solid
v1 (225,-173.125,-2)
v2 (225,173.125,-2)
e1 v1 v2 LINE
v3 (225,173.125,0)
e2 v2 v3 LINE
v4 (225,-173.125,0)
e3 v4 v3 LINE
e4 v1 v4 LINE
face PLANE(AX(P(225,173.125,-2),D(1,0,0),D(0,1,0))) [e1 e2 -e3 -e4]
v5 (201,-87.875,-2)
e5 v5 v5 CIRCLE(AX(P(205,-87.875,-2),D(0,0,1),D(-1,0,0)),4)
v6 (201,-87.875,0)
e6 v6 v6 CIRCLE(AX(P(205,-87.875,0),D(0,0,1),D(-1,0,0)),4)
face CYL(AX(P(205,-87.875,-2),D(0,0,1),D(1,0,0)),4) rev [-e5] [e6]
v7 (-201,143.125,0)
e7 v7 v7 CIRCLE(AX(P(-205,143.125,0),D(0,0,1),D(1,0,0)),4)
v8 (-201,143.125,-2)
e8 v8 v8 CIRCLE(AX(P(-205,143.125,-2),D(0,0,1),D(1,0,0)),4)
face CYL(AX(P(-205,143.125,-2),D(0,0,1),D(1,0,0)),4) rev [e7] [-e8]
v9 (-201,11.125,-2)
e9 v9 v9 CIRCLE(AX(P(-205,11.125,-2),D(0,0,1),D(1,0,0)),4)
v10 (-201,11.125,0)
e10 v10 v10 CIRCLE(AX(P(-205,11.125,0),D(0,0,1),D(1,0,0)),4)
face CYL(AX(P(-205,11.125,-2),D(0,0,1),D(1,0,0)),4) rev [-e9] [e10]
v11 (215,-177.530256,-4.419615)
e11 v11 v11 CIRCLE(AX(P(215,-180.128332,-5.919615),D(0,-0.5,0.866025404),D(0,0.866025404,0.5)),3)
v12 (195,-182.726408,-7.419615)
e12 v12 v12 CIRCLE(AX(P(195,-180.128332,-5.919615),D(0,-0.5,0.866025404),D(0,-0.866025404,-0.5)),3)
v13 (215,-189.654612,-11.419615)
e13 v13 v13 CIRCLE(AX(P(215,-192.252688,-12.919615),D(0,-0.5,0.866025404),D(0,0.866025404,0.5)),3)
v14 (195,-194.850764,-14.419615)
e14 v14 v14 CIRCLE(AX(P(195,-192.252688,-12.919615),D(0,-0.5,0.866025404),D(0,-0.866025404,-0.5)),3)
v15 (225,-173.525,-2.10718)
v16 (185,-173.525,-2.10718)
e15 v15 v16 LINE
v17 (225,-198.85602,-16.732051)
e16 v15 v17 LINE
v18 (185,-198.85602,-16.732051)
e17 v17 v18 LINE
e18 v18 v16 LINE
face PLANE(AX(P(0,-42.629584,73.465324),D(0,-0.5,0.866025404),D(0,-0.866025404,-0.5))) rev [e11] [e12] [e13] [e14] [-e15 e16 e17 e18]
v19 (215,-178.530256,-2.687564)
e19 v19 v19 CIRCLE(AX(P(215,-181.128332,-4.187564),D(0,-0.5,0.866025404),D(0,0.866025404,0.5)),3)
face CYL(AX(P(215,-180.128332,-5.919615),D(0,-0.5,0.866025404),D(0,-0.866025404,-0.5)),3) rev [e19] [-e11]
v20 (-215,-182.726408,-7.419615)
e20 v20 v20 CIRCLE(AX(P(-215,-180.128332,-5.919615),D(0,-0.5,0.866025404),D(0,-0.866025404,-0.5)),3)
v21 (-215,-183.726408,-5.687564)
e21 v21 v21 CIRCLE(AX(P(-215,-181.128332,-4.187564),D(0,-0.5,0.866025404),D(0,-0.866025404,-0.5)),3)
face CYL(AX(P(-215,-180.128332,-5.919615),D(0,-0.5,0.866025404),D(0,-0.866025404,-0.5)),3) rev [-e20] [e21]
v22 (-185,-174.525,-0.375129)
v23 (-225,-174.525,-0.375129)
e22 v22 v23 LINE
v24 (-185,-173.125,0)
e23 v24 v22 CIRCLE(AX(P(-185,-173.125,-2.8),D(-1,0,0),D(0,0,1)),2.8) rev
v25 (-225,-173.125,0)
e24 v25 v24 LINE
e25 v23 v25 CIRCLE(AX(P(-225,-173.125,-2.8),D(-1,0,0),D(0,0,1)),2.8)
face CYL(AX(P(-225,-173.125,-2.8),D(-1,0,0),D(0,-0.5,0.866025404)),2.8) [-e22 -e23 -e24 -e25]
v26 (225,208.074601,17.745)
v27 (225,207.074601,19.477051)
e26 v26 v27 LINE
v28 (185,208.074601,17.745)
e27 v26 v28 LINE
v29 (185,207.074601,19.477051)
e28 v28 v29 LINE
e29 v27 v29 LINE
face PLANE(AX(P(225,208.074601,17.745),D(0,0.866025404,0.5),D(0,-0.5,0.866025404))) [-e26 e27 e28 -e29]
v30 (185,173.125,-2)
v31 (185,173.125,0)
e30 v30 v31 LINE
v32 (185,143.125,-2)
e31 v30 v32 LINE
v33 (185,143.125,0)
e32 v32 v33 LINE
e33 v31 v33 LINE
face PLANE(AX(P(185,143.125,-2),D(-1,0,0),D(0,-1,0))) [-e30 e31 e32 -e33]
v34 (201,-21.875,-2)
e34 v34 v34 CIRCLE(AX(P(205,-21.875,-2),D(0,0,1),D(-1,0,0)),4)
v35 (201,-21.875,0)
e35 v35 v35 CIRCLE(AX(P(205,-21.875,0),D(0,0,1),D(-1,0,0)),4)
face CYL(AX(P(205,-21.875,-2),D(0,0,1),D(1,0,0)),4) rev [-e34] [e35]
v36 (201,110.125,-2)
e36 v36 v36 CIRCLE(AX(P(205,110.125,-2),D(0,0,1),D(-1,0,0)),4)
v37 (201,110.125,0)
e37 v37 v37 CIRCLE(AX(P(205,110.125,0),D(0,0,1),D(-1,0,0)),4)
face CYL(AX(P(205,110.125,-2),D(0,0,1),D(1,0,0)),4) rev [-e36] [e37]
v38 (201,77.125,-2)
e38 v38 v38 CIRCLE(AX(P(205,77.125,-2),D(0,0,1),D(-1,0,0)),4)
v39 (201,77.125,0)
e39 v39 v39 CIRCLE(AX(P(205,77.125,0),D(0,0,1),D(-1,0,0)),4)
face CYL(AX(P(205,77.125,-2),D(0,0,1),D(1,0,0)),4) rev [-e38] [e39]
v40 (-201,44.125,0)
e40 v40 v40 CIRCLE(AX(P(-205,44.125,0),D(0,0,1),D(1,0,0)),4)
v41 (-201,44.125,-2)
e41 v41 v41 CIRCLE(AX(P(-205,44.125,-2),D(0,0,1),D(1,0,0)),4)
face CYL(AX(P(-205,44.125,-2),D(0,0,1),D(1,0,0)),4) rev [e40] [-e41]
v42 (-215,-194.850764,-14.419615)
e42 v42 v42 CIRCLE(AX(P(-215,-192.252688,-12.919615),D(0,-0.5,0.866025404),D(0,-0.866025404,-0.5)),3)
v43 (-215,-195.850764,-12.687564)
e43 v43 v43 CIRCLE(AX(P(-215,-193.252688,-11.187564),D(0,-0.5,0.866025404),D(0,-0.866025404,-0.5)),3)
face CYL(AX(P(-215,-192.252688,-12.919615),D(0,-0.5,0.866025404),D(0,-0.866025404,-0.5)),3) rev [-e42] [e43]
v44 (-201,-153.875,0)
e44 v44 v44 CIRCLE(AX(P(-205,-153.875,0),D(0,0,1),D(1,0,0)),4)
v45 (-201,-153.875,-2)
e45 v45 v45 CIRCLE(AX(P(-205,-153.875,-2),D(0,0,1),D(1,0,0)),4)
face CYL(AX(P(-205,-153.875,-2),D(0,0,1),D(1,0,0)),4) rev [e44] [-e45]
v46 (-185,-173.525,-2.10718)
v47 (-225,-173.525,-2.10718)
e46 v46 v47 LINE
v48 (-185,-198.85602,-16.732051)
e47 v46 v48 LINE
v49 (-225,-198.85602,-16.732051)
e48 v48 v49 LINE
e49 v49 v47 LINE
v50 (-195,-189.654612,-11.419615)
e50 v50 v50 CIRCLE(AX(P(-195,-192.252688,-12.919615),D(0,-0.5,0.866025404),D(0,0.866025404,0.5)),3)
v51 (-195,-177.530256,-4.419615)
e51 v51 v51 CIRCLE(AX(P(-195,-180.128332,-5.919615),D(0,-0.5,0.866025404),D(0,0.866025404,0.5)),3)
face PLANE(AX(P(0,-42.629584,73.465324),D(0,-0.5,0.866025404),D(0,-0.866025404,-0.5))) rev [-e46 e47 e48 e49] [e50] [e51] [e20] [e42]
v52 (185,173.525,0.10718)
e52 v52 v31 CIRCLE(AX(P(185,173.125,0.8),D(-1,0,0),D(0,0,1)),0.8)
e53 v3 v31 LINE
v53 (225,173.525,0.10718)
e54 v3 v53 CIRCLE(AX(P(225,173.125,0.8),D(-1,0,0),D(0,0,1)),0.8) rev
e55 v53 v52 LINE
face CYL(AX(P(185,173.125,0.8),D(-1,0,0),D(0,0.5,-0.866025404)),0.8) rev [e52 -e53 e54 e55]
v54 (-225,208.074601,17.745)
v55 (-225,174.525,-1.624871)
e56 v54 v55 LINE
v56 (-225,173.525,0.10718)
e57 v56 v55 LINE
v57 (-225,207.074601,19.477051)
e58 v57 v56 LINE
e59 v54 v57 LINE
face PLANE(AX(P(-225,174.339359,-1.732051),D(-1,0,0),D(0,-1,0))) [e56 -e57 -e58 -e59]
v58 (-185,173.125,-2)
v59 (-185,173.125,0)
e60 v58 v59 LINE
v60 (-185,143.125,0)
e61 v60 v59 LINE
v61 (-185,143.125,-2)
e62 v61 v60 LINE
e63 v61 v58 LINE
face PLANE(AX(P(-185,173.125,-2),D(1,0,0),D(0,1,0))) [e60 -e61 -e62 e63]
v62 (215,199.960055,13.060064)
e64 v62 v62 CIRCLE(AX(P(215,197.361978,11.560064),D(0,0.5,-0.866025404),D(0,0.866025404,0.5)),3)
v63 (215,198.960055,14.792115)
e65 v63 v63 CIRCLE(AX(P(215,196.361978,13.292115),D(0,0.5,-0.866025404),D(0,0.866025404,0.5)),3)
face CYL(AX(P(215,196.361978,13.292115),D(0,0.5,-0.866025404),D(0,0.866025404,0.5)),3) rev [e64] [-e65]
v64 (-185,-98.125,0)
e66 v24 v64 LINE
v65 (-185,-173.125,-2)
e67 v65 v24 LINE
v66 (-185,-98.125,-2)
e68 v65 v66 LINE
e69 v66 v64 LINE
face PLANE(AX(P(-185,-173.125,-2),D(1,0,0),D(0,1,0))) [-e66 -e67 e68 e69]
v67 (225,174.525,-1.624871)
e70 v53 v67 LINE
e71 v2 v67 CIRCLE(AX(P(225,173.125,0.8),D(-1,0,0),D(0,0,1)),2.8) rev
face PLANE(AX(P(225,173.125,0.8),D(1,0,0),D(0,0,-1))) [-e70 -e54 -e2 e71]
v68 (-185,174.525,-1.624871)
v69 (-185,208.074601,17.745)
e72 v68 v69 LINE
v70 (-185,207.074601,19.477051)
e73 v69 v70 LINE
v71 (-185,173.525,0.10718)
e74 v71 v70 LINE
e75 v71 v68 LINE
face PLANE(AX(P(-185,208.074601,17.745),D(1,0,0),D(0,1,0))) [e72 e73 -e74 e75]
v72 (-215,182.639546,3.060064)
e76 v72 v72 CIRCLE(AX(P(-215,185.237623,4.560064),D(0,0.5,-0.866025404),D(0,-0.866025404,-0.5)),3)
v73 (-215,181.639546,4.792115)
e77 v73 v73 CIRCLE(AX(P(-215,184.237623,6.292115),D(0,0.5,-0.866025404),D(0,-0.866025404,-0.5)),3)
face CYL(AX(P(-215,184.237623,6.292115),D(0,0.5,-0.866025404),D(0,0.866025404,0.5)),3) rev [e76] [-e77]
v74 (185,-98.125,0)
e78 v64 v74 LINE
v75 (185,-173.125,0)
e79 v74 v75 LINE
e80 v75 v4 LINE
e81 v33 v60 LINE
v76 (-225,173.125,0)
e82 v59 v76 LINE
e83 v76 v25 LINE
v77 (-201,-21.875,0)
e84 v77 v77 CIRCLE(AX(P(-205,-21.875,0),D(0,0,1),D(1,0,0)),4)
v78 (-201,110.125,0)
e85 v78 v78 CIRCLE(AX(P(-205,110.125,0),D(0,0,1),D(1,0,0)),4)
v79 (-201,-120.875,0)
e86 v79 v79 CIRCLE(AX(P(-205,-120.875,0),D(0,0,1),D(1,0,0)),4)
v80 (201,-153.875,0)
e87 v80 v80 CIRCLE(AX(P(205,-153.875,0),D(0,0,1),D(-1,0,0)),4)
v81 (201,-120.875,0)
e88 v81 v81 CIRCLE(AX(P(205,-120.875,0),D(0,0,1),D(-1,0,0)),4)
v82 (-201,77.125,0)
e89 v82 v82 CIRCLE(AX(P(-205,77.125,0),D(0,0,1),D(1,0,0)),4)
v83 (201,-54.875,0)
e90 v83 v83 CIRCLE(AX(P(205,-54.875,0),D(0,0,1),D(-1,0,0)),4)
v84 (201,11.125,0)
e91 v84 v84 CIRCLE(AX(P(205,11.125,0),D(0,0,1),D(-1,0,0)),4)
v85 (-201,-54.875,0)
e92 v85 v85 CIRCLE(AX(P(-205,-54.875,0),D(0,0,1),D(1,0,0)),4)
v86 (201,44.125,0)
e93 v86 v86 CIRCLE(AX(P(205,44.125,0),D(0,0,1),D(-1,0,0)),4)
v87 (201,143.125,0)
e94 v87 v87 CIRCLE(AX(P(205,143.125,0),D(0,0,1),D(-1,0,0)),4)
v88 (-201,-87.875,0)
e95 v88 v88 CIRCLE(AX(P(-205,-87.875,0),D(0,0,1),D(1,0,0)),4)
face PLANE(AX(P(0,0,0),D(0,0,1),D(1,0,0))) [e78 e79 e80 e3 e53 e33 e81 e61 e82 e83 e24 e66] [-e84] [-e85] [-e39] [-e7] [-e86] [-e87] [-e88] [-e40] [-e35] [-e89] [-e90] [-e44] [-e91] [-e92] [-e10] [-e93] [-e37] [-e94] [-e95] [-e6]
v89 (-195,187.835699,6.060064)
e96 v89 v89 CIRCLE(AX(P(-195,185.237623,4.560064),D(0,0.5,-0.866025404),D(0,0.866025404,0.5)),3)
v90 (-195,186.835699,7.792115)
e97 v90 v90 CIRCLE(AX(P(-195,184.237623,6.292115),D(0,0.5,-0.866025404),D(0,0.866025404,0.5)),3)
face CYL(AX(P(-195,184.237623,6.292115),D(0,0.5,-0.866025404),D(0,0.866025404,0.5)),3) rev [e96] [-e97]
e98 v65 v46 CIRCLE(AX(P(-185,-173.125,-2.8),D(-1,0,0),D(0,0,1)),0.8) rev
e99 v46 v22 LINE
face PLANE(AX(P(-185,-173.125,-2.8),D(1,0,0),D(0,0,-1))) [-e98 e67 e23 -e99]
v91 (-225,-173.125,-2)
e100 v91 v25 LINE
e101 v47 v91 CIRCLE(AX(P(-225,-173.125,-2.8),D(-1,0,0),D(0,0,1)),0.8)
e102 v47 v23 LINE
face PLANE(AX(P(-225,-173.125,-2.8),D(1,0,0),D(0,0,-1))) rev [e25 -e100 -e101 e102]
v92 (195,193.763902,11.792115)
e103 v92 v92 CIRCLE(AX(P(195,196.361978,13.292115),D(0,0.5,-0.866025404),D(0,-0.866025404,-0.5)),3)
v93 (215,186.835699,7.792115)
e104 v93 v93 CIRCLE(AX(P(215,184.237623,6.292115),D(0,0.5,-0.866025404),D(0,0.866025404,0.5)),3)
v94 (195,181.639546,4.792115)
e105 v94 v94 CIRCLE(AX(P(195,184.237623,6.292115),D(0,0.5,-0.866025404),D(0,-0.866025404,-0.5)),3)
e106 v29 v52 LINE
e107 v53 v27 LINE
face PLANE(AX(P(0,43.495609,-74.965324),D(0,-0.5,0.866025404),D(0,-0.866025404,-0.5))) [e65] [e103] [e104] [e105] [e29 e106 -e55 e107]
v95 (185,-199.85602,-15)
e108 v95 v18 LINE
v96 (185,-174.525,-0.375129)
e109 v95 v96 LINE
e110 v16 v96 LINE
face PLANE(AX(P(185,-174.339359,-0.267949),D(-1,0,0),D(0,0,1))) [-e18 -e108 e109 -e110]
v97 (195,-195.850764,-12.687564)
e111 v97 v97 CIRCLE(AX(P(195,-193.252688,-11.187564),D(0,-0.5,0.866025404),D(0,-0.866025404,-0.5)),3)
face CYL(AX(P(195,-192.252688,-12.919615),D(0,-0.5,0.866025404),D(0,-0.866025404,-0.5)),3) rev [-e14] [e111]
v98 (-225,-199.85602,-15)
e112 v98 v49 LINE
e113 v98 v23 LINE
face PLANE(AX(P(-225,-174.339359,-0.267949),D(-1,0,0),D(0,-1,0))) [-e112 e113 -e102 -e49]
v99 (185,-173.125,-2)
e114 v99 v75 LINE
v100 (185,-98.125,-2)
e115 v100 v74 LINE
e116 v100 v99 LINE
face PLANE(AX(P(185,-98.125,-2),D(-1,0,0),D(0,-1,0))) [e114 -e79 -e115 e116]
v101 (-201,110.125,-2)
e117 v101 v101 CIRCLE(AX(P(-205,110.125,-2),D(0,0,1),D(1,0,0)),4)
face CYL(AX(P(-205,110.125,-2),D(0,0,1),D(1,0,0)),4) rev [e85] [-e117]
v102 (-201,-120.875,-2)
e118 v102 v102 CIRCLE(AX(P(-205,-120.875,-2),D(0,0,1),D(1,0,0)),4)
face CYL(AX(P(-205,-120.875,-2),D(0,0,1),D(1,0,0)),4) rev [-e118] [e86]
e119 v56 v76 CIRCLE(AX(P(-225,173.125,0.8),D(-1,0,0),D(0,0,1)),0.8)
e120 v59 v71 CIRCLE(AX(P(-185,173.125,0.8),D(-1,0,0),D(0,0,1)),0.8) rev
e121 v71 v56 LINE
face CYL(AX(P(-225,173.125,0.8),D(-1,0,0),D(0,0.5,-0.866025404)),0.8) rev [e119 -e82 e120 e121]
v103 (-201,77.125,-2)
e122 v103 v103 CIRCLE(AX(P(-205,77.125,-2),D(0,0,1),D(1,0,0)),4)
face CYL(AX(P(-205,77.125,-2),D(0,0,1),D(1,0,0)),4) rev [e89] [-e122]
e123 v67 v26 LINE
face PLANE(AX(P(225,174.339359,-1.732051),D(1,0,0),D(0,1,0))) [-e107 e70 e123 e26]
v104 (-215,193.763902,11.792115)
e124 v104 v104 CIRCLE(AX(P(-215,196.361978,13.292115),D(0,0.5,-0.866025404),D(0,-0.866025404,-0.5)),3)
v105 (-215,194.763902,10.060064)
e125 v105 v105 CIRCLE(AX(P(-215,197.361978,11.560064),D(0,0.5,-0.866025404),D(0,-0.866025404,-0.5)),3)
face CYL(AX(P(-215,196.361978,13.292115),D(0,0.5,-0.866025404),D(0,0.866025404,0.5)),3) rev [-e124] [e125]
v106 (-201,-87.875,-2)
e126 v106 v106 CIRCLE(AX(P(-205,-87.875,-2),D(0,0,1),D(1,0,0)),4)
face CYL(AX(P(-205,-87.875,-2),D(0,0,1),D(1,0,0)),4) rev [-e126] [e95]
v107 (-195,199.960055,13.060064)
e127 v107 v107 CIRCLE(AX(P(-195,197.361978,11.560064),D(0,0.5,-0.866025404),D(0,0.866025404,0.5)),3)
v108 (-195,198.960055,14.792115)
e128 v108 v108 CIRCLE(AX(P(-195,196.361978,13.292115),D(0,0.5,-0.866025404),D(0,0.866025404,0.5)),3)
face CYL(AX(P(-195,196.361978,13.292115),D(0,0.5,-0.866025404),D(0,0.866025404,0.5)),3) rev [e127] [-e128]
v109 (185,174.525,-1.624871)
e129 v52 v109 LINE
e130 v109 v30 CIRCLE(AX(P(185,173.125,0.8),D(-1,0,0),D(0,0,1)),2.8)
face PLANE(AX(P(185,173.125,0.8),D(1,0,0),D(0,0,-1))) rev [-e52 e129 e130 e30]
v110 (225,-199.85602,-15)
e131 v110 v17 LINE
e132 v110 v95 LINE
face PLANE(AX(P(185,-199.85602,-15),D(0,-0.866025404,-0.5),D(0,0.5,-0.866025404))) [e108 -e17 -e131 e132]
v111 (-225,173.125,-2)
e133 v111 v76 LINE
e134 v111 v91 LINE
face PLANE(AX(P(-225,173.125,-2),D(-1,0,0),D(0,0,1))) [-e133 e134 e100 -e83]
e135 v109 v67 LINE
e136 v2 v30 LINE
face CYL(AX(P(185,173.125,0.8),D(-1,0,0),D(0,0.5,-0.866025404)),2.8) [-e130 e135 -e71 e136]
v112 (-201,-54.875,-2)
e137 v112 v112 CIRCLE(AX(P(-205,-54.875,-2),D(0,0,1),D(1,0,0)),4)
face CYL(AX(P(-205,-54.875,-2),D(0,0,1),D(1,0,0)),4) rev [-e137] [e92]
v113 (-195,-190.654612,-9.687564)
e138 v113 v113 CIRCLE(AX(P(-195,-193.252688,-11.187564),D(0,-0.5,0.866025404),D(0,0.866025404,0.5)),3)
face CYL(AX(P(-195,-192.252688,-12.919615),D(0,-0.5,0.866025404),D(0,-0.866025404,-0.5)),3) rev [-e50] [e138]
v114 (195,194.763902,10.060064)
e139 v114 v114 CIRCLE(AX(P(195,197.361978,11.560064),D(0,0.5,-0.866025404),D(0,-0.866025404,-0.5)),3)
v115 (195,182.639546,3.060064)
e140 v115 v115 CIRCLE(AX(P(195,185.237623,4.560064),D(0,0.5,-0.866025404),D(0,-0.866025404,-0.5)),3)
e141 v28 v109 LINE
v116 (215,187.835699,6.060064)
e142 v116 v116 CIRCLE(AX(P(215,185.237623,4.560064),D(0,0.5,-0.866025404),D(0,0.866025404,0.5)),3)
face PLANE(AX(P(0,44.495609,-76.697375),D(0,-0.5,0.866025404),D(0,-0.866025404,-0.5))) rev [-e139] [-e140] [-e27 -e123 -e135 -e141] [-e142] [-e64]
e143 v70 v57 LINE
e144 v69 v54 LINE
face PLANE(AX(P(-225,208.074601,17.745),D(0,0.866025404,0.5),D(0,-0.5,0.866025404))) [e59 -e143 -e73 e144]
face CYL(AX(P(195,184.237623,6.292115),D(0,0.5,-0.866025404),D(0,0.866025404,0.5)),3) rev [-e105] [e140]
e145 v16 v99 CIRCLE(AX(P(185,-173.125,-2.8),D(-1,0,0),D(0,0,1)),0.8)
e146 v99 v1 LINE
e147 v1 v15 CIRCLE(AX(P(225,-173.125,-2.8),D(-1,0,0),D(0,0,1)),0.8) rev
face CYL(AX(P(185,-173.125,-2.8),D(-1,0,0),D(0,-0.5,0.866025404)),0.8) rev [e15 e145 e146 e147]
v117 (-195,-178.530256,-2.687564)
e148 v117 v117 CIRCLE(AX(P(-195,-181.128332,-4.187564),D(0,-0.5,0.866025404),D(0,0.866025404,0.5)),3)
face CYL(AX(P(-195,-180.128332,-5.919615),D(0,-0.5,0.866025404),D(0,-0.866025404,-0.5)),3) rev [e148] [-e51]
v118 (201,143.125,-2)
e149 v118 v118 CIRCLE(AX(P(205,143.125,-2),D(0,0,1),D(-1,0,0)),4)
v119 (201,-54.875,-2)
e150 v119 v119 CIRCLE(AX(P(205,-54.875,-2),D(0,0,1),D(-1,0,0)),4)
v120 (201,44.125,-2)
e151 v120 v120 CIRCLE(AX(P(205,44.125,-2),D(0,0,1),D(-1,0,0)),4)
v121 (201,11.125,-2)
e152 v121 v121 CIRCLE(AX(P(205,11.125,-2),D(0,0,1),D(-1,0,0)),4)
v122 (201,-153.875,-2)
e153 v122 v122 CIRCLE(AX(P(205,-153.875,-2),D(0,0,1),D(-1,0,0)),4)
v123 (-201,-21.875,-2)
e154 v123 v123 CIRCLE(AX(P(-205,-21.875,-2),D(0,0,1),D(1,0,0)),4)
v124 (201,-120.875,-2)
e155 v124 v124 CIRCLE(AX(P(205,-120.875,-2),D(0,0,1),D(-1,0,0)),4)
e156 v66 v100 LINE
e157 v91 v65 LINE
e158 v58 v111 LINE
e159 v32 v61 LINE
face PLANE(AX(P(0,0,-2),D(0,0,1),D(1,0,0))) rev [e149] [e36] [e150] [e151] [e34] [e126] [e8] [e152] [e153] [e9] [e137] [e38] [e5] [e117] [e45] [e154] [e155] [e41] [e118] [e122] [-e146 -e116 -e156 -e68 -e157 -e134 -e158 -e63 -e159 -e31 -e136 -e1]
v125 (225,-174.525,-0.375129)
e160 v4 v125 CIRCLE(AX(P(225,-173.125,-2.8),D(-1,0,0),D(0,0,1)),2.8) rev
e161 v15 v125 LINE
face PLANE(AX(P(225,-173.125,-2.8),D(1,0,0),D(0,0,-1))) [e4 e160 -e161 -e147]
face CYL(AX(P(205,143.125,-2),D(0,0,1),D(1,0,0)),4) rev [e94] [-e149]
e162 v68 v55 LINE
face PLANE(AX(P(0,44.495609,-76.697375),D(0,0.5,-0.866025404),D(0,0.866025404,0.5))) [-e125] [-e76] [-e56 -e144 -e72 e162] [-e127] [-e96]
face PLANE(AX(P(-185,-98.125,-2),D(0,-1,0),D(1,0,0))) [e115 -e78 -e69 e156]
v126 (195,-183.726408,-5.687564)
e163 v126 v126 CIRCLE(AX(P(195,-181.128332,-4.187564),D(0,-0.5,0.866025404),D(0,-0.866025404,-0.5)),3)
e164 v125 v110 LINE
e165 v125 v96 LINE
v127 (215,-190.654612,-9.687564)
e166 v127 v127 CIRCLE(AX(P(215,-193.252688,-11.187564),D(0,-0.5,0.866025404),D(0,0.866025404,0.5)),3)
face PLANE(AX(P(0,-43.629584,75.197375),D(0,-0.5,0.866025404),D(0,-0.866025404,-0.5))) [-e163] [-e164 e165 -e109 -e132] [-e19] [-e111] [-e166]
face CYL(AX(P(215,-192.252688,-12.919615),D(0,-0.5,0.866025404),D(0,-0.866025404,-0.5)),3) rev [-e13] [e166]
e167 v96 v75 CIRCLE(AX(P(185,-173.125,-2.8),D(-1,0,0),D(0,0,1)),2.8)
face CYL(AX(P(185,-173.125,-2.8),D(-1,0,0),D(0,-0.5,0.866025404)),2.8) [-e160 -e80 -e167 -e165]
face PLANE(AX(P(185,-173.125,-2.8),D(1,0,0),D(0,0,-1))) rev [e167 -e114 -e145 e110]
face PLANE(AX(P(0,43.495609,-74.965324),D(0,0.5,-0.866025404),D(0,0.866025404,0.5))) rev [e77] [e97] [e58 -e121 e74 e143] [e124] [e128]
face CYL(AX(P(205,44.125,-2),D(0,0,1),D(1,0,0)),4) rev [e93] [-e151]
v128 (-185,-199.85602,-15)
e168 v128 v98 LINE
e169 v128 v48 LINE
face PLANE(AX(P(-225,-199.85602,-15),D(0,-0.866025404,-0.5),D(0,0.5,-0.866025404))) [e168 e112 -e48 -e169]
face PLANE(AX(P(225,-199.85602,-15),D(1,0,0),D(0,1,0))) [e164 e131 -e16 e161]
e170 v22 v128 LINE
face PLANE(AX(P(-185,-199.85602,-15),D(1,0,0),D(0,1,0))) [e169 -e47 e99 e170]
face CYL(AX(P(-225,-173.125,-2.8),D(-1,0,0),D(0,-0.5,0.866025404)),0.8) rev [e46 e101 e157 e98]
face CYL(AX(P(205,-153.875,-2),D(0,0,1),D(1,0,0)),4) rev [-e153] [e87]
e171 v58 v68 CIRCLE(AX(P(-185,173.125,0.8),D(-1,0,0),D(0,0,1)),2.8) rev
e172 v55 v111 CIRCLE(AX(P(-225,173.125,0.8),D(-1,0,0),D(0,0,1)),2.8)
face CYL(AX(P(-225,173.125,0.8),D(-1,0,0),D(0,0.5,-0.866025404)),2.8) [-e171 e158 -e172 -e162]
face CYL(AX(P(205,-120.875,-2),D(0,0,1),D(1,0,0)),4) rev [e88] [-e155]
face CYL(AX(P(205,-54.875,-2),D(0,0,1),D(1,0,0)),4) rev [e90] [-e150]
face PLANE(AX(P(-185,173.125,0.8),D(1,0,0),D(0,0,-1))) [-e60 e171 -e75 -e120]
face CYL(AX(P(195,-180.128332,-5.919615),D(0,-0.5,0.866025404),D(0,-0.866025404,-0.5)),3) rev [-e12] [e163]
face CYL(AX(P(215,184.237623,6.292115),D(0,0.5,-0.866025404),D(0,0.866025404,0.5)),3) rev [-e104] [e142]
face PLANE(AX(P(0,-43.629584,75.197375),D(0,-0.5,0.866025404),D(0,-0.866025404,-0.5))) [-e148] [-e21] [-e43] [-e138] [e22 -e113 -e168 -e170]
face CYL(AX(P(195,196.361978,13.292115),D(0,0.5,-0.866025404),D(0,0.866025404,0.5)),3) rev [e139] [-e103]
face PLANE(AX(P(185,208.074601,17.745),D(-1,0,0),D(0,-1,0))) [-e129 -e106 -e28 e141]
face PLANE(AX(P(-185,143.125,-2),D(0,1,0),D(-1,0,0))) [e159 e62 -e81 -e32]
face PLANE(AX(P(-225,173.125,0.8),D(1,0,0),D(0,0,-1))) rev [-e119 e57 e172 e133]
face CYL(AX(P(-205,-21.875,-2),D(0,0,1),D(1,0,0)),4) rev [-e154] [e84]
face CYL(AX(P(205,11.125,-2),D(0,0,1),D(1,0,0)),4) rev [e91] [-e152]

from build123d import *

# Parameters (mm, degrees)
BASE_FLANGE1_DEPTH      = 2
EDGE_FLANGE1_DEPTH      = 40
EDGE_FLANGE1_BEND_DEPTH = 40
EDGE_FLANGE2_DEPTH      = 40
EDGE_FLANGE2_BEND_DEPTH = 40
SKETCH28_R              = 4
CUT_EXTRUDE1_DEPTH      = 2
SKETCH29_R              = 3
CUT_EXTRUDE2_DEPTH      = 2
SKETCH30_R              = 3
CUT_EXTRUDE3_DEPTH      = 2


# Sheet-metal steps are written as plain solids
with BuildPart() as part:
    # Sketch1 → Base-Flange1 (new body)
    with BuildSketch(Plane.XY):
        Polygon((-225, 173.125), (-225, -173.125), (-185, -173.125), (-185, -98.125), (185, -98.125), (185, -173.125), (225, -173.125), (225, 173.125), (185, 173.125), (185, 143.125), (-185, 143.125), (-185, 173.125), align=None)
    extrude(amount=-BASE_FLANGE1_DEPTH)

    # Edge-Flange1 section (across the edge) → Edge-Flange1 (add)
    with BuildSketch(Plane(origin=(-185, 173.339359354, 0), x_dir=(0, -0.49999999999999495, 0.8660254037844416), z_dir=(-1, 0, 0))):
        with BuildLine():
            Line((-2, 0.214359354), (-2, 38.954101615))
            Line((-2, 38.954101615), (0, 38.954101615))
            Line((0, 38.954101615), (0, 0.214359354))
            ThreePointArc((0, 0.214359354), (0.027259339, 0.007304118), (0.107179677, -0.185640646))
            Line((0.107179677, -0.185640646), (-1.624871131, -1.185640646))
            ThreePointArc((-1.624871131, -1.185640646), (-1.904592314, -0.510333972), (-2, 0.214359354))
        make_face()
    extrude(amount=EDGE_FLANGE1_DEPTH)

    # Edge-Flange1 section 2 (across the edge) → Edge-Flange1 bend (add)
    with BuildSketch(Plane(origin=(225, 173.339359354, 0), x_dir=(0, -0.49999999999999495, 0.8660254037844416), z_dir=(-1, 0, 0))):
        with BuildLine():
            Line((-2, 0.214359354), (-2, 38.954101615))
            Line((-2, 38.954101615), (0, 38.954101615))
            Line((0, 38.954101615), (0, 0.214359354))
            ThreePointArc((0, 0.214359354), (0.027259339, 0.007304118), (0.107179677, -0.185640646))
            Line((0.107179677, -0.185640646), (-1.624871131, -1.185640646))
            ThreePointArc((-1.624871131, -1.185640646), (-1.904592314, -0.510333972), (-2, 0.214359354))
        make_face()
    extrude(amount=EDGE_FLANGE1_BEND_DEPTH)

    # Edge-Flange2 section (across the edge) → Edge-Flange2 (add)
    with BuildSketch(Plane(origin=(-185, -173.339359354, -2), x_dir=(0, 0.49999999999999495, -0.8660254037844416), z_dir=(-1, 0, 0))):
        with BuildLine():
            Line((-2, 0.214359354), (-2, 29.464101615))
            Line((-2, 29.464101615), (0, 29.464101615))
            Line((0, 29.464101615), (0, 0.214359354))
            ThreePointArc((0, 0.214359354), (0.027259339, 0.007304118), (0.107179677, -0.185640646))
            Line((0.107179677, -0.185640646), (-1.624871131, -1.185640646))
            ThreePointArc((-1.624871131, -1.185640646), (-1.904592314, -0.510333972), (-2, 0.214359354))
        make_face()
    extrude(amount=EDGE_FLANGE2_DEPTH)

    # Edge-Flange2 section 2 (across the edge) → Edge-Flange2 bend (add)
    with BuildSketch(Plane(origin=(225, -173.339359354, -2), x_dir=(-1.3877787807814315e-15, 0.49999999999999495, -0.8660254037844416), z_dir=(-1, 0, 0))):
        with BuildLine():
            Line((-2, 0.214359354), (-2, 29.464101615))
            Line((-2, 29.464101615), (0, 29.464101615))
            Line((0, 29.464101615), (0, 0.214359354))
            ThreePointArc((0, 0.214359354), (0.027259339, 0.007304118), (0.107179677, -0.185640646))
            Line((0.107179677, -0.185640646), (-1.624871131, -1.185640646))
            ThreePointArc((-1.624871131, -1.185640646), (-1.904592314, -0.510333972), (-2, 0.214359354))
        make_face()
    extrude(amount=EDGE_FLANGE2_BEND_DEPTH)

    # Sketch28 → Cut-Extrude1 (cut)
    with BuildSketch(Plane.XY):
        with Locations((-205, 143.125)):
            Circle(SKETCH28_R)
        with Locations((-205, 110.125)):
            Circle(SKETCH28_R)
        with Locations((-205, 77.125)):
            Circle(SKETCH28_R)
        with Locations((-205, 44.125)):
            Circle(SKETCH28_R)
        with Locations((-205, 11.125)):
            Circle(SKETCH28_R)
        with Locations((-205, -21.875)):
            Circle(SKETCH28_R)
        with Locations((-205, -54.875)):
            Circle(SKETCH28_R)
        with Locations((-205, -87.875)):
            Circle(SKETCH28_R)
        with Locations((-205, -120.875)):
            Circle(SKETCH28_R)
        with Locations((-205, -153.875)):
            Circle(SKETCH28_R)
        with Locations(Location((205, -153.875, 0), (0, 0, 180))):
            Circle(SKETCH28_R)
        with Locations(Location((205, -120.875, 0), (0, 0, 180))):
            Circle(SKETCH28_R)
        with Locations(Location((205, -87.875, 0), (0, 0, 180))):
            Circle(SKETCH28_R)
        with Locations(Location((205, -54.875, 0), (0, 0, 180))):
            Circle(SKETCH28_R)
        with Locations(Location((205, -21.875, 0), (0, 0, 180))):
            Circle(SKETCH28_R)
        with Locations(Location((205, 11.125, 0), (0, 0, 180))):
            Circle(SKETCH28_R)
        with Locations(Location((205, 44.125, 0), (0, 0, 180))):
            Circle(SKETCH28_R)
        with Locations(Location((205, 77.125, 0), (0, 0, 180))):
            Circle(SKETCH28_R)
        with Locations(Location((205, 110.125, 0), (0, 0, 180))):
            Circle(SKETCH28_R)
        with Locations(Location((205, 143.125, 0), (0, 0, 180))):
            Circle(SKETCH28_R)
    extrude(amount=-CUT_EXTRUDE1_DEPTH, mode=Mode.SUBTRACT)

    # Sketch29 → Cut-Extrude2 (cut)
    with BuildSketch(Plane(origin=(0, -43.468814435, 75.290195146), x_dir=(1, 0, 0), z_dir=(0, -0.49999999999999517, 0.8660254037844416))):
        with Locations(Location((-215, -158.955519161, 0), (0, 0, 270))):
            Circle(SKETCH29_R)
        with Locations(Location((-215, -172.955519161, 0), (0, 0, 270))):
            Circle(SKETCH29_R)
        with Locations(Location((-195, -172.955519161, 0), (0, 0, 90))):
            Circle(SKETCH29_R)
        with Locations(Location((-195, -158.955519161, 0), (0, 0, 90))):
            Circle(SKETCH29_R)
        with Locations(Location((195, -172.955519161, 0), (0, 0, 270))):
            Circle(SKETCH29_R)
        with Locations(Location((195, -158.955519161, 0), (0, 0, 270))):
            Circle(SKETCH29_R)
        with Locations(Location((215, -158.955519161, 0), (0, 0, 90))):
            Circle(SKETCH29_R)
        with Locations(Location((215, -172.955519161, 0), (0, 0, 90))):
            Circle(SKETCH29_R)
    extrude(amount=-CUT_EXTRUDE2_DEPTH, mode=Mode.SUBTRACT)

    # Sketch30 → Cut-Extrude3 (cut)
    with BuildSketch(Plane(origin=(0, 44.334839838, -76.790195146), x_dir=(-1, 0, 0), z_dir=(0, 0.499999999999995, -0.8660254037844416))):
        with Locations(Location((-215, 176.700519161, 0), (0, 0, 90))):
            Circle(SKETCH30_R)
        with Locations(Location((-215, 162.700519161, 0), (0, 0, 90))):
            Circle(SKETCH30_R)
        with Locations(Location((-195, 162.700519161, 0), (0, 0, 270))):
            Circle(SKETCH30_R)
        with Locations(Location((-195, 176.700519161, 0), (0, 0, 270))):
            Circle(SKETCH30_R)
        with Locations(Location((195, 162.700519161, 0), (0, 0, 90))):
            Circle(SKETCH30_R)
        with Locations(Location((195, 176.700519161, 0), (0, 0, 90))):
            Circle(SKETCH30_R)
        with Locations(Location((215, 176.700519161, 0), (0, 0, 270))):
            Circle(SKETCH30_R)
        with Locations(Location((215, 162.700519161, 0), (0, 0, 270))):
            Circle(SKETCH30_R)
    extrude(amount=-CUT_EXTRUDE3_DEPTH, mode=Mode.SUBTRACT)


solid = part.part
